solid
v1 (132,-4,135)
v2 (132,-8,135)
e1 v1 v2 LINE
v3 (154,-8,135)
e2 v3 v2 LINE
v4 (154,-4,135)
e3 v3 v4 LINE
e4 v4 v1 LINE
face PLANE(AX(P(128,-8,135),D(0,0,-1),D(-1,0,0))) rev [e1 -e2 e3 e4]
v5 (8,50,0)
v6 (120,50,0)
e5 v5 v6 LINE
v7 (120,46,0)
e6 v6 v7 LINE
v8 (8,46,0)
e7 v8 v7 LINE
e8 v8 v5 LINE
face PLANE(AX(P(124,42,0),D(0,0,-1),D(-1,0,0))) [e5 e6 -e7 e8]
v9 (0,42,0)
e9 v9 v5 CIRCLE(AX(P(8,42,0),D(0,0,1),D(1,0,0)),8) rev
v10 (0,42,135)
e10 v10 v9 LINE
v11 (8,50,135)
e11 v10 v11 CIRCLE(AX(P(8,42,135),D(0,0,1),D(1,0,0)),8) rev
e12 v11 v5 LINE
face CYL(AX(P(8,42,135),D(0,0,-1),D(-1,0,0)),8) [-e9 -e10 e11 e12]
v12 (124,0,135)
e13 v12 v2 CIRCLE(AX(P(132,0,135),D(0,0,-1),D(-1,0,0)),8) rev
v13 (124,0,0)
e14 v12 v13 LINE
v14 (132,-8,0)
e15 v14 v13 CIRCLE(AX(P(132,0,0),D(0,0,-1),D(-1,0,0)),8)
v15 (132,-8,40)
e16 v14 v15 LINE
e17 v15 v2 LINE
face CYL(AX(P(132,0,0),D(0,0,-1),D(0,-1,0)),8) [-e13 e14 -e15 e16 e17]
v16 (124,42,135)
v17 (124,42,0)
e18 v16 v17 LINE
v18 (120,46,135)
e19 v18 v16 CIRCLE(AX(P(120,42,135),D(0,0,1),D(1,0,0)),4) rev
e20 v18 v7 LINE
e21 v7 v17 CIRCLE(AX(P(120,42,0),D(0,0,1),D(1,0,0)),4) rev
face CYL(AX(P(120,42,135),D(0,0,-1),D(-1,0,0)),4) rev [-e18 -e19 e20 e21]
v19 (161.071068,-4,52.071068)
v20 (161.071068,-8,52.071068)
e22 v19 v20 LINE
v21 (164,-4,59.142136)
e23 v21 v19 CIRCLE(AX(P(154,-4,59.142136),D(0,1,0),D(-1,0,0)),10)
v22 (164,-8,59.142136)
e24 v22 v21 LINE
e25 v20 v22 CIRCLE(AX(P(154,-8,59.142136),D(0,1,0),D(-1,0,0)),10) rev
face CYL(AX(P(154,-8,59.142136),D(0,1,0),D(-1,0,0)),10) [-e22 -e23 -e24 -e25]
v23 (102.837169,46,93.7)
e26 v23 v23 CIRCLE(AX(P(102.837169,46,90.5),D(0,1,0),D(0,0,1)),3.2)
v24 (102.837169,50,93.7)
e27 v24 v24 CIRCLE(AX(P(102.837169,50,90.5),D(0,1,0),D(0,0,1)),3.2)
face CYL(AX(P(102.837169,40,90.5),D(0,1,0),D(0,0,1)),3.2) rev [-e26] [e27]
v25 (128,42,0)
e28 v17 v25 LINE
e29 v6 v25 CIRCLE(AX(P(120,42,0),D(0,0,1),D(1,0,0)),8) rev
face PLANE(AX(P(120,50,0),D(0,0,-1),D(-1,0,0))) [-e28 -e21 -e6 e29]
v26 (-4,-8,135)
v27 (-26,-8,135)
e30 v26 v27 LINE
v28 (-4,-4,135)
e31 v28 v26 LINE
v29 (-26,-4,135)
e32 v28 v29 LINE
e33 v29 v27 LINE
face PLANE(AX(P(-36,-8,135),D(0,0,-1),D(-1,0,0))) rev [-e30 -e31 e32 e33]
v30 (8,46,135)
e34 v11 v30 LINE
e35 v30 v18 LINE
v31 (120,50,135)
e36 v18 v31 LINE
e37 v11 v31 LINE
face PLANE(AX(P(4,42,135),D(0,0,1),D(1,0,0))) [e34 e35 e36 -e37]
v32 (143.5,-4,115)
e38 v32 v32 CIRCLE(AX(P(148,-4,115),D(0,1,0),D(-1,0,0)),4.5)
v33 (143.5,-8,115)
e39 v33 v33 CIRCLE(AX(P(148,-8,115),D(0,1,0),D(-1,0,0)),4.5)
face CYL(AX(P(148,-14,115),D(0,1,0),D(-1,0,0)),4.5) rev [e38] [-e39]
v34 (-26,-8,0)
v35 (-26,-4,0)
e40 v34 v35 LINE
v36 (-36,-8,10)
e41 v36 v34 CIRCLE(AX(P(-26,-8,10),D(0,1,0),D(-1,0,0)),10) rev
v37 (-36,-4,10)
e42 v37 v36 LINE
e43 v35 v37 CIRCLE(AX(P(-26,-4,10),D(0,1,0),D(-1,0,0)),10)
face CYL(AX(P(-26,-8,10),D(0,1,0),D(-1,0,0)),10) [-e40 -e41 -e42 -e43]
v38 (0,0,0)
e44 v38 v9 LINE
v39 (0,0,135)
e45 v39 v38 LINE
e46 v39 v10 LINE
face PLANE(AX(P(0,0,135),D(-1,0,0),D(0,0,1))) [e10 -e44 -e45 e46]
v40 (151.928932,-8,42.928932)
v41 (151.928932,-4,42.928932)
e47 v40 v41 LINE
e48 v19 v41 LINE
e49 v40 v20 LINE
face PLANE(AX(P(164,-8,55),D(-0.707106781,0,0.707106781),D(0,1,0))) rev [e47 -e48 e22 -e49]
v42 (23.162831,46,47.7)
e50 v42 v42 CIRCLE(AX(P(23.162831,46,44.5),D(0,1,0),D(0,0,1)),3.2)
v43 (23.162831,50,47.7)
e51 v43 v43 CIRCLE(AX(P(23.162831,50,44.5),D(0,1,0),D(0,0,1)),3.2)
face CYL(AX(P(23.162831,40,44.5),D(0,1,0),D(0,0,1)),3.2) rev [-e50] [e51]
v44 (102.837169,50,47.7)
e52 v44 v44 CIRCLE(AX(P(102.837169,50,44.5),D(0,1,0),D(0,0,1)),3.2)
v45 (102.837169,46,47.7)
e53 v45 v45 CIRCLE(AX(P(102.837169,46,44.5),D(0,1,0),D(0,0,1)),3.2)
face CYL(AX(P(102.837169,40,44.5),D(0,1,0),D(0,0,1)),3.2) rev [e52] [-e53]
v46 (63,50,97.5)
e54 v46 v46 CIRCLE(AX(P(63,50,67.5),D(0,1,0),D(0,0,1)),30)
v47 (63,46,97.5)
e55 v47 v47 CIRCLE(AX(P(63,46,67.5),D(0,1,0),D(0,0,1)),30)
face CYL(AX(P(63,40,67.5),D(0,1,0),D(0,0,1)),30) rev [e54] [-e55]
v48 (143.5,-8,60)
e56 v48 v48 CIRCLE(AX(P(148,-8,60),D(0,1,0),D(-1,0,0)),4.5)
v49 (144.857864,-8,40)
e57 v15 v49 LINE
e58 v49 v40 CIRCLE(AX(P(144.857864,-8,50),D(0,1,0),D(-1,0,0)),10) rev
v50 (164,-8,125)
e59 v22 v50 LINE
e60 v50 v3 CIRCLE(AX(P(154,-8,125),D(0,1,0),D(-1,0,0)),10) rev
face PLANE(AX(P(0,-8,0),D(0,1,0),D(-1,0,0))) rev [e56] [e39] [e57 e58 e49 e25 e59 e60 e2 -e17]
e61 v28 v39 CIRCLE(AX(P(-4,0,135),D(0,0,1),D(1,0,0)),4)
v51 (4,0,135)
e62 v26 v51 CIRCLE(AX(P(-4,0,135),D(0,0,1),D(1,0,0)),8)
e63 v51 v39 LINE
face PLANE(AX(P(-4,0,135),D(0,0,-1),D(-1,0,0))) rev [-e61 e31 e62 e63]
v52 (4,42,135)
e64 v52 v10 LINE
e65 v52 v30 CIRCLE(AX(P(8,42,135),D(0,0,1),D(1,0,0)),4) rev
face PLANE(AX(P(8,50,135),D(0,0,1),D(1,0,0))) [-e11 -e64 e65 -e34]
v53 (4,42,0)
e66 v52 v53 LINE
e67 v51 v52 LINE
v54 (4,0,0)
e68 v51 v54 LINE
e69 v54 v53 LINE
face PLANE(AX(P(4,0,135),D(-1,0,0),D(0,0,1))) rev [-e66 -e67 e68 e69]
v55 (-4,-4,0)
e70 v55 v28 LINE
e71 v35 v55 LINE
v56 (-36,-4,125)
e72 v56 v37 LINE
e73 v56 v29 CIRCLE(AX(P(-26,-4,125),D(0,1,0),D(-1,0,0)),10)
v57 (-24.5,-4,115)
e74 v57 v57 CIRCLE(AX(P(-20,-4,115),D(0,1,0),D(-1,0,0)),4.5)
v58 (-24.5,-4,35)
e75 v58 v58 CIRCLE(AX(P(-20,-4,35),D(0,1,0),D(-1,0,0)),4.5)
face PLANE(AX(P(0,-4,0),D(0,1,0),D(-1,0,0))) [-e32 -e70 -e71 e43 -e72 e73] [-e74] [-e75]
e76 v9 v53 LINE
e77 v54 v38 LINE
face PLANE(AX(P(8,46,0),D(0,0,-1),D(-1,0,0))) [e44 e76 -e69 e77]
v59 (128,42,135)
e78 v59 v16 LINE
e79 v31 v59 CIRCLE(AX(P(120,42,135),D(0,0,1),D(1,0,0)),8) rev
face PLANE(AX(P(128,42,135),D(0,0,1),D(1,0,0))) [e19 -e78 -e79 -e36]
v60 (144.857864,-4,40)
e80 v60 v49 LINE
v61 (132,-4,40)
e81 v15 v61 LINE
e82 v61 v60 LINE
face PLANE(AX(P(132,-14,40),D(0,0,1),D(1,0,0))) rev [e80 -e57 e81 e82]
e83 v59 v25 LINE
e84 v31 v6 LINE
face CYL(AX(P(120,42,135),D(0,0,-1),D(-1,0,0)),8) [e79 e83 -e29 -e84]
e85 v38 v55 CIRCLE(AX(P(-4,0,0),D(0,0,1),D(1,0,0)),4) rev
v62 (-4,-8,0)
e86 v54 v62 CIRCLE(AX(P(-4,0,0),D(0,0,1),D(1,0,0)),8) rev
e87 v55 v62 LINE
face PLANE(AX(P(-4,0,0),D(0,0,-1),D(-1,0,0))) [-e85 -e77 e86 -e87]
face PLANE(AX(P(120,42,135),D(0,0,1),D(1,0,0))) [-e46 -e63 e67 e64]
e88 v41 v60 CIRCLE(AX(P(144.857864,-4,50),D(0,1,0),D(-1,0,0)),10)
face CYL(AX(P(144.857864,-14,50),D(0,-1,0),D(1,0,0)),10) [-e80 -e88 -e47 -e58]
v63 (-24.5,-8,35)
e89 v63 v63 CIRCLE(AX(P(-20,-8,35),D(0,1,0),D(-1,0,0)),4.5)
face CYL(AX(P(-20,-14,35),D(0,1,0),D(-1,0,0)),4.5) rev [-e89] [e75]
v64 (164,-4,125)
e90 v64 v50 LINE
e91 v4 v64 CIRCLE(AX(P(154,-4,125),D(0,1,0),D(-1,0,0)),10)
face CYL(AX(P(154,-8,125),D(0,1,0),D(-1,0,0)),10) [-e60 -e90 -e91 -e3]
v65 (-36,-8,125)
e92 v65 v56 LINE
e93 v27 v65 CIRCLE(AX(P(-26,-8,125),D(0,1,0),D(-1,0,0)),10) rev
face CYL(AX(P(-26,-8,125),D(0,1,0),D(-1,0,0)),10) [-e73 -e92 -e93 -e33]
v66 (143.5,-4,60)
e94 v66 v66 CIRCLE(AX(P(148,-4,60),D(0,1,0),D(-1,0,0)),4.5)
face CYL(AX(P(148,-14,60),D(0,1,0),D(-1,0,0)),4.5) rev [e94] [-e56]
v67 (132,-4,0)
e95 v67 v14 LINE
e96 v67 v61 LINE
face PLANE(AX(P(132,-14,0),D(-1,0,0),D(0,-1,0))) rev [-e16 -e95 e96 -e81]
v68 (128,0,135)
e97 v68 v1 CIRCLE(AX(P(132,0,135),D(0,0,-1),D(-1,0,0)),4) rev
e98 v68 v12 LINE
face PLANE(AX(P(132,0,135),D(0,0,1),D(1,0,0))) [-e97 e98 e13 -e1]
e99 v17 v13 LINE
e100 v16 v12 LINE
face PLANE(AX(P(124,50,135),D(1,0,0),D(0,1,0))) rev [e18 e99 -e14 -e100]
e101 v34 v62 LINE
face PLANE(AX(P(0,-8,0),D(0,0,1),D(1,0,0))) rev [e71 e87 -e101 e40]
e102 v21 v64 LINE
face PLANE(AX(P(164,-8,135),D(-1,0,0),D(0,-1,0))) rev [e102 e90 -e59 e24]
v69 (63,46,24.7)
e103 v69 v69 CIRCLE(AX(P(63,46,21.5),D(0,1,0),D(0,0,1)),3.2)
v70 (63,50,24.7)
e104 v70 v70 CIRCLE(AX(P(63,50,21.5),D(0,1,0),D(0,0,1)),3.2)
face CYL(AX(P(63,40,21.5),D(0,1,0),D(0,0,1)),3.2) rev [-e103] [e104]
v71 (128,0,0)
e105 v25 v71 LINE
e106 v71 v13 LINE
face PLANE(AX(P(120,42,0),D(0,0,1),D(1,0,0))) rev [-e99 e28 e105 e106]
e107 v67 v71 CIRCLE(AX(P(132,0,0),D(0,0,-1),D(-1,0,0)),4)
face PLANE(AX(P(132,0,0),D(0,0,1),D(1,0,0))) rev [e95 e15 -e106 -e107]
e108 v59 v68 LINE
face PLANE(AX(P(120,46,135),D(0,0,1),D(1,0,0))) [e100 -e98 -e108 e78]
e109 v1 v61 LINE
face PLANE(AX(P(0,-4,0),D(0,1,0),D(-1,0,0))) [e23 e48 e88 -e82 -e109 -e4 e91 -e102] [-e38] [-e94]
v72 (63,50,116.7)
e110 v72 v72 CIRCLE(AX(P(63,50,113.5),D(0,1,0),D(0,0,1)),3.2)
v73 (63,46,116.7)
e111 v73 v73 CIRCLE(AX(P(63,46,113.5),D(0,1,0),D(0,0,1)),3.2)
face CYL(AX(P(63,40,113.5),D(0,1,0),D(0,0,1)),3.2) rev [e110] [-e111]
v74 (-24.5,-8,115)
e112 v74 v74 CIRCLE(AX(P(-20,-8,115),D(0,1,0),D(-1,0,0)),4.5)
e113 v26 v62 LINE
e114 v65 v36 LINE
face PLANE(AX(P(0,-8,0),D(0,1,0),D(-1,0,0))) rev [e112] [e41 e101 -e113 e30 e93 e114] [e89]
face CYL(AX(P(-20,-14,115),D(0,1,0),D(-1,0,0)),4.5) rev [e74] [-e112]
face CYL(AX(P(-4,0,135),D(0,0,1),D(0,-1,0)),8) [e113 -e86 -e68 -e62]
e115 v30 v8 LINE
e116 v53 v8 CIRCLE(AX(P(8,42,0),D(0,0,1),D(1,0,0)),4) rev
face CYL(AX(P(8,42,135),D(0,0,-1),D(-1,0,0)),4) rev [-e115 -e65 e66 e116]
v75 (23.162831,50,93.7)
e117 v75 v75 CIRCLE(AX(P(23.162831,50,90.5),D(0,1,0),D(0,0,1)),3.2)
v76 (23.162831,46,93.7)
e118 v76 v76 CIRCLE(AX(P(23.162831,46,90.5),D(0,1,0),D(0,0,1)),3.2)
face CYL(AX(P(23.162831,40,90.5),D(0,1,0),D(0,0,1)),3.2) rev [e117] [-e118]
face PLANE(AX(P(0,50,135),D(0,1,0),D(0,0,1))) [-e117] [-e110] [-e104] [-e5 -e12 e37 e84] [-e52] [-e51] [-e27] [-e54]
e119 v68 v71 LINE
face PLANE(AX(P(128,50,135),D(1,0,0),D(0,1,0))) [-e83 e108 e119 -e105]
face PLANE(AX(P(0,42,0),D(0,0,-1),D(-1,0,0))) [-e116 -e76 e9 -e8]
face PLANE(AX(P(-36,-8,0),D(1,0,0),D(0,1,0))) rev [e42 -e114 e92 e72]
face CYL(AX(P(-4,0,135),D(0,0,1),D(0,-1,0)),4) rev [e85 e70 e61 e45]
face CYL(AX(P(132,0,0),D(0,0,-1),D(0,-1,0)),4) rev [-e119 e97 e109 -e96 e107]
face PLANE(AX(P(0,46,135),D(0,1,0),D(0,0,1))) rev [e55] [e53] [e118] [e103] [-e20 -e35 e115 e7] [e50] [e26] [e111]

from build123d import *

# Parameters (mm, degrees)
TABAN_FLAN_1_DEPTH      = 135
IZIM2_R                 = 3.2
IZIM2_R_2               = 30
KES_EKSTR_ZYON1_DEPTH   = 10
KENAR_FLAN_1_DEPTH      = 135
KENAR_FLAN_1_BEND_DEPTH = 135
IZIM6_W                 = 32
IZIM6_H                 = 40
KES_EKSTR_ZYON2_DEPTH   = 10
RADYUS2_R               = 10
IZIM10_R                = 4.5
KES_EKSTR_ZYON3_DEPTH   = 10
PAH1_SIZE               = 15
RADYUS3_R               = 10


# Sheet-metal steps are written as plain solids
with BuildPart() as part:
    # Çizim1 → Taban-Flanş1 (new body)
    with BuildSketch(Plane.XY):
        with BuildLine():
            Line((0, 0), (0, 42))
            ThreePointArc((0, 42), (2.343145751, 47.656854249), (8, 50))
            Line((8, 50), (120, 50))
            ThreePointArc((120, 50), (125.656854249, 47.656854249), (128, 42))
            Line((128, 42), (128, 0))
            Line((128, 0), (124, 0))
            Line((124, 0), (124, 42))
            ThreePointArc((124, 42), (122.828427125, 44.828427125), (120, 46))
            Line((120, 46), (8, 46))
            ThreePointArc((8, 46), (5.171572875, 44.828427125), (4, 42))
            Line((4, 42), (4, 0))
            Line((4, 0), (0, 0))
        make_face()
    extrude(amount=TABAN_FLAN_1_DEPTH)

    # Çizim2 → Kes-Ekstrüzyon1 (cut)
    with BuildSketch(Plane(origin=(0, 50, 0), x_dir=(1, 0, 0), z_dir=(0, 1, 0))):
        with Locations(Location((63, -21.5, 0), (0, 0, 270))):
            Circle(IZIM2_R)
        with Locations(Location((102.837168574, -44.5, 0), (0, 0, 270))):
            Circle(IZIM2_R)
        with Locations(Location((102.837168574, -90.5, 0), (0, 0, 270))):
            Circle(IZIM2_R)
        with Locations(Location((63, -113.5, 0), (0, 0, 270))):
            Circle(IZIM2_R)
        with Locations(Location((23.162831426, -90.5, 0), (0, 0, 270))):
            Circle(IZIM2_R)
        with Locations(Location((23.162831426, -44.5, 0), (0, 0, 270))):
            Circle(IZIM2_R)
        with Locations(Location((63, -67.5, 0), (0, 0, 270))):
            Circle(IZIM2_R_2)
    extrude(amount=-KES_EKSTR_ZYON1_DEPTH, mode=Mode.SUBTRACT)

    # Kenar-Flanş1 section (across the edge) → Kenar-Flanş1 (add)
    with BuildSketch(Plane(origin=(128, -4, 135), x_dir=(0, 1, 0), z_dir=(0, 0, -1))):
        with BuildLine():
            Line((-4, 4), (-4, 36))
            Line((-4, 36), (0, 36))
            Line((0, 36), (0, 4))
            ThreePointArc((0, 4), (1.171572875, 1.171572875), (4, 0))
            Line((4, 0), (4, -4))
            ThreePointArc((4, -4), (-1.656854249, -1.656854249), (-4, 4))
        make_face()
    extrude(amount=KENAR_FLAN_1_DEPTH)

    # Kenar-Flanş1 section 2 (across the edge) → Kenar-Flanş1 bend (add)
    with BuildSketch(Plane(origin=(0, -4, 0), x_dir=(0, 1, 0), z_dir=(0, 0, 1))):
        with BuildLine():
            Line((-4, 4), (-4, 36))
            Line((-4, 36), (0, 36))
            Line((0, 36), (0, 4))
            ThreePointArc((0, 4), (1.171572875, 1.171572875), (4, 0))
            Line((4, 0), (4, -4))
            ThreePointArc((4, -4), (-1.656854249, -1.656854249), (-4, 4))
        make_face()
    extrude(amount=KENAR_FLAN_1_BEND_DEPTH)

    # Çizim6 → Kes-Ekstrüzyon2 (cut)
    with BuildSketch(Plane(origin=(0, -4, 0), x_dir=(1, 0, 0), z_dir=(0, 1, 0))):
        with Locations((148, -20)):
            Rectangle(IZIM6_W, IZIM6_H)
    extrude(amount=-KES_EKSTR_ZYON2_DEPTH, mode=Mode.SUBTRACT)

    # Radyus2
    radyus2_edges = [part.edges().sort_by_distance(p)[0] for p in [
        (-36, -6, 0),
        (-36, -6, 135),
        (164, -6, 135),
    ]]
    fillet(radyus2_edges, radius=RADYUS2_R)

    # Çizim10 → Kes-Ekstrüzyon3 (cut)
    with BuildSketch(Plane(origin=(0, -4, 0), x_dir=(1, 0, 0), z_dir=(0, 1, 0))):
        with Locations(Location((148, -115, 0), (0, 0, 180))):
            Circle(IZIM10_R)
        with Locations(Location((148, -60, 0), (0, 0, 180))):
            Circle(IZIM10_R)
        with Locations(Location((-20, -115, 0), (0, 0, 180))):
            Circle(IZIM10_R)
        with Locations(Location((-20, -35, 0), (0, 0, 180))):
            Circle(IZIM10_R)
    extrude(amount=-KES_EKSTR_ZYON3_DEPTH, mode=Mode.SUBTRACT)

    # Pah1
    pah1_edges = [part.edges().sort_by_distance(p)[0] for p in [
        (164, -6, 40),
    ]]
    chamfer(pah1_edges, length=PAH1_SIZE)

    # Radyus3
    radyus3_edges = [part.edges().sort_by_distance(p)[0] for p in [
        (164, -6, 55),
        (149, -6, 40),
    ]]
    fillet(radyus3_edges, radius=RADYUS3_R)


solid = part.part
